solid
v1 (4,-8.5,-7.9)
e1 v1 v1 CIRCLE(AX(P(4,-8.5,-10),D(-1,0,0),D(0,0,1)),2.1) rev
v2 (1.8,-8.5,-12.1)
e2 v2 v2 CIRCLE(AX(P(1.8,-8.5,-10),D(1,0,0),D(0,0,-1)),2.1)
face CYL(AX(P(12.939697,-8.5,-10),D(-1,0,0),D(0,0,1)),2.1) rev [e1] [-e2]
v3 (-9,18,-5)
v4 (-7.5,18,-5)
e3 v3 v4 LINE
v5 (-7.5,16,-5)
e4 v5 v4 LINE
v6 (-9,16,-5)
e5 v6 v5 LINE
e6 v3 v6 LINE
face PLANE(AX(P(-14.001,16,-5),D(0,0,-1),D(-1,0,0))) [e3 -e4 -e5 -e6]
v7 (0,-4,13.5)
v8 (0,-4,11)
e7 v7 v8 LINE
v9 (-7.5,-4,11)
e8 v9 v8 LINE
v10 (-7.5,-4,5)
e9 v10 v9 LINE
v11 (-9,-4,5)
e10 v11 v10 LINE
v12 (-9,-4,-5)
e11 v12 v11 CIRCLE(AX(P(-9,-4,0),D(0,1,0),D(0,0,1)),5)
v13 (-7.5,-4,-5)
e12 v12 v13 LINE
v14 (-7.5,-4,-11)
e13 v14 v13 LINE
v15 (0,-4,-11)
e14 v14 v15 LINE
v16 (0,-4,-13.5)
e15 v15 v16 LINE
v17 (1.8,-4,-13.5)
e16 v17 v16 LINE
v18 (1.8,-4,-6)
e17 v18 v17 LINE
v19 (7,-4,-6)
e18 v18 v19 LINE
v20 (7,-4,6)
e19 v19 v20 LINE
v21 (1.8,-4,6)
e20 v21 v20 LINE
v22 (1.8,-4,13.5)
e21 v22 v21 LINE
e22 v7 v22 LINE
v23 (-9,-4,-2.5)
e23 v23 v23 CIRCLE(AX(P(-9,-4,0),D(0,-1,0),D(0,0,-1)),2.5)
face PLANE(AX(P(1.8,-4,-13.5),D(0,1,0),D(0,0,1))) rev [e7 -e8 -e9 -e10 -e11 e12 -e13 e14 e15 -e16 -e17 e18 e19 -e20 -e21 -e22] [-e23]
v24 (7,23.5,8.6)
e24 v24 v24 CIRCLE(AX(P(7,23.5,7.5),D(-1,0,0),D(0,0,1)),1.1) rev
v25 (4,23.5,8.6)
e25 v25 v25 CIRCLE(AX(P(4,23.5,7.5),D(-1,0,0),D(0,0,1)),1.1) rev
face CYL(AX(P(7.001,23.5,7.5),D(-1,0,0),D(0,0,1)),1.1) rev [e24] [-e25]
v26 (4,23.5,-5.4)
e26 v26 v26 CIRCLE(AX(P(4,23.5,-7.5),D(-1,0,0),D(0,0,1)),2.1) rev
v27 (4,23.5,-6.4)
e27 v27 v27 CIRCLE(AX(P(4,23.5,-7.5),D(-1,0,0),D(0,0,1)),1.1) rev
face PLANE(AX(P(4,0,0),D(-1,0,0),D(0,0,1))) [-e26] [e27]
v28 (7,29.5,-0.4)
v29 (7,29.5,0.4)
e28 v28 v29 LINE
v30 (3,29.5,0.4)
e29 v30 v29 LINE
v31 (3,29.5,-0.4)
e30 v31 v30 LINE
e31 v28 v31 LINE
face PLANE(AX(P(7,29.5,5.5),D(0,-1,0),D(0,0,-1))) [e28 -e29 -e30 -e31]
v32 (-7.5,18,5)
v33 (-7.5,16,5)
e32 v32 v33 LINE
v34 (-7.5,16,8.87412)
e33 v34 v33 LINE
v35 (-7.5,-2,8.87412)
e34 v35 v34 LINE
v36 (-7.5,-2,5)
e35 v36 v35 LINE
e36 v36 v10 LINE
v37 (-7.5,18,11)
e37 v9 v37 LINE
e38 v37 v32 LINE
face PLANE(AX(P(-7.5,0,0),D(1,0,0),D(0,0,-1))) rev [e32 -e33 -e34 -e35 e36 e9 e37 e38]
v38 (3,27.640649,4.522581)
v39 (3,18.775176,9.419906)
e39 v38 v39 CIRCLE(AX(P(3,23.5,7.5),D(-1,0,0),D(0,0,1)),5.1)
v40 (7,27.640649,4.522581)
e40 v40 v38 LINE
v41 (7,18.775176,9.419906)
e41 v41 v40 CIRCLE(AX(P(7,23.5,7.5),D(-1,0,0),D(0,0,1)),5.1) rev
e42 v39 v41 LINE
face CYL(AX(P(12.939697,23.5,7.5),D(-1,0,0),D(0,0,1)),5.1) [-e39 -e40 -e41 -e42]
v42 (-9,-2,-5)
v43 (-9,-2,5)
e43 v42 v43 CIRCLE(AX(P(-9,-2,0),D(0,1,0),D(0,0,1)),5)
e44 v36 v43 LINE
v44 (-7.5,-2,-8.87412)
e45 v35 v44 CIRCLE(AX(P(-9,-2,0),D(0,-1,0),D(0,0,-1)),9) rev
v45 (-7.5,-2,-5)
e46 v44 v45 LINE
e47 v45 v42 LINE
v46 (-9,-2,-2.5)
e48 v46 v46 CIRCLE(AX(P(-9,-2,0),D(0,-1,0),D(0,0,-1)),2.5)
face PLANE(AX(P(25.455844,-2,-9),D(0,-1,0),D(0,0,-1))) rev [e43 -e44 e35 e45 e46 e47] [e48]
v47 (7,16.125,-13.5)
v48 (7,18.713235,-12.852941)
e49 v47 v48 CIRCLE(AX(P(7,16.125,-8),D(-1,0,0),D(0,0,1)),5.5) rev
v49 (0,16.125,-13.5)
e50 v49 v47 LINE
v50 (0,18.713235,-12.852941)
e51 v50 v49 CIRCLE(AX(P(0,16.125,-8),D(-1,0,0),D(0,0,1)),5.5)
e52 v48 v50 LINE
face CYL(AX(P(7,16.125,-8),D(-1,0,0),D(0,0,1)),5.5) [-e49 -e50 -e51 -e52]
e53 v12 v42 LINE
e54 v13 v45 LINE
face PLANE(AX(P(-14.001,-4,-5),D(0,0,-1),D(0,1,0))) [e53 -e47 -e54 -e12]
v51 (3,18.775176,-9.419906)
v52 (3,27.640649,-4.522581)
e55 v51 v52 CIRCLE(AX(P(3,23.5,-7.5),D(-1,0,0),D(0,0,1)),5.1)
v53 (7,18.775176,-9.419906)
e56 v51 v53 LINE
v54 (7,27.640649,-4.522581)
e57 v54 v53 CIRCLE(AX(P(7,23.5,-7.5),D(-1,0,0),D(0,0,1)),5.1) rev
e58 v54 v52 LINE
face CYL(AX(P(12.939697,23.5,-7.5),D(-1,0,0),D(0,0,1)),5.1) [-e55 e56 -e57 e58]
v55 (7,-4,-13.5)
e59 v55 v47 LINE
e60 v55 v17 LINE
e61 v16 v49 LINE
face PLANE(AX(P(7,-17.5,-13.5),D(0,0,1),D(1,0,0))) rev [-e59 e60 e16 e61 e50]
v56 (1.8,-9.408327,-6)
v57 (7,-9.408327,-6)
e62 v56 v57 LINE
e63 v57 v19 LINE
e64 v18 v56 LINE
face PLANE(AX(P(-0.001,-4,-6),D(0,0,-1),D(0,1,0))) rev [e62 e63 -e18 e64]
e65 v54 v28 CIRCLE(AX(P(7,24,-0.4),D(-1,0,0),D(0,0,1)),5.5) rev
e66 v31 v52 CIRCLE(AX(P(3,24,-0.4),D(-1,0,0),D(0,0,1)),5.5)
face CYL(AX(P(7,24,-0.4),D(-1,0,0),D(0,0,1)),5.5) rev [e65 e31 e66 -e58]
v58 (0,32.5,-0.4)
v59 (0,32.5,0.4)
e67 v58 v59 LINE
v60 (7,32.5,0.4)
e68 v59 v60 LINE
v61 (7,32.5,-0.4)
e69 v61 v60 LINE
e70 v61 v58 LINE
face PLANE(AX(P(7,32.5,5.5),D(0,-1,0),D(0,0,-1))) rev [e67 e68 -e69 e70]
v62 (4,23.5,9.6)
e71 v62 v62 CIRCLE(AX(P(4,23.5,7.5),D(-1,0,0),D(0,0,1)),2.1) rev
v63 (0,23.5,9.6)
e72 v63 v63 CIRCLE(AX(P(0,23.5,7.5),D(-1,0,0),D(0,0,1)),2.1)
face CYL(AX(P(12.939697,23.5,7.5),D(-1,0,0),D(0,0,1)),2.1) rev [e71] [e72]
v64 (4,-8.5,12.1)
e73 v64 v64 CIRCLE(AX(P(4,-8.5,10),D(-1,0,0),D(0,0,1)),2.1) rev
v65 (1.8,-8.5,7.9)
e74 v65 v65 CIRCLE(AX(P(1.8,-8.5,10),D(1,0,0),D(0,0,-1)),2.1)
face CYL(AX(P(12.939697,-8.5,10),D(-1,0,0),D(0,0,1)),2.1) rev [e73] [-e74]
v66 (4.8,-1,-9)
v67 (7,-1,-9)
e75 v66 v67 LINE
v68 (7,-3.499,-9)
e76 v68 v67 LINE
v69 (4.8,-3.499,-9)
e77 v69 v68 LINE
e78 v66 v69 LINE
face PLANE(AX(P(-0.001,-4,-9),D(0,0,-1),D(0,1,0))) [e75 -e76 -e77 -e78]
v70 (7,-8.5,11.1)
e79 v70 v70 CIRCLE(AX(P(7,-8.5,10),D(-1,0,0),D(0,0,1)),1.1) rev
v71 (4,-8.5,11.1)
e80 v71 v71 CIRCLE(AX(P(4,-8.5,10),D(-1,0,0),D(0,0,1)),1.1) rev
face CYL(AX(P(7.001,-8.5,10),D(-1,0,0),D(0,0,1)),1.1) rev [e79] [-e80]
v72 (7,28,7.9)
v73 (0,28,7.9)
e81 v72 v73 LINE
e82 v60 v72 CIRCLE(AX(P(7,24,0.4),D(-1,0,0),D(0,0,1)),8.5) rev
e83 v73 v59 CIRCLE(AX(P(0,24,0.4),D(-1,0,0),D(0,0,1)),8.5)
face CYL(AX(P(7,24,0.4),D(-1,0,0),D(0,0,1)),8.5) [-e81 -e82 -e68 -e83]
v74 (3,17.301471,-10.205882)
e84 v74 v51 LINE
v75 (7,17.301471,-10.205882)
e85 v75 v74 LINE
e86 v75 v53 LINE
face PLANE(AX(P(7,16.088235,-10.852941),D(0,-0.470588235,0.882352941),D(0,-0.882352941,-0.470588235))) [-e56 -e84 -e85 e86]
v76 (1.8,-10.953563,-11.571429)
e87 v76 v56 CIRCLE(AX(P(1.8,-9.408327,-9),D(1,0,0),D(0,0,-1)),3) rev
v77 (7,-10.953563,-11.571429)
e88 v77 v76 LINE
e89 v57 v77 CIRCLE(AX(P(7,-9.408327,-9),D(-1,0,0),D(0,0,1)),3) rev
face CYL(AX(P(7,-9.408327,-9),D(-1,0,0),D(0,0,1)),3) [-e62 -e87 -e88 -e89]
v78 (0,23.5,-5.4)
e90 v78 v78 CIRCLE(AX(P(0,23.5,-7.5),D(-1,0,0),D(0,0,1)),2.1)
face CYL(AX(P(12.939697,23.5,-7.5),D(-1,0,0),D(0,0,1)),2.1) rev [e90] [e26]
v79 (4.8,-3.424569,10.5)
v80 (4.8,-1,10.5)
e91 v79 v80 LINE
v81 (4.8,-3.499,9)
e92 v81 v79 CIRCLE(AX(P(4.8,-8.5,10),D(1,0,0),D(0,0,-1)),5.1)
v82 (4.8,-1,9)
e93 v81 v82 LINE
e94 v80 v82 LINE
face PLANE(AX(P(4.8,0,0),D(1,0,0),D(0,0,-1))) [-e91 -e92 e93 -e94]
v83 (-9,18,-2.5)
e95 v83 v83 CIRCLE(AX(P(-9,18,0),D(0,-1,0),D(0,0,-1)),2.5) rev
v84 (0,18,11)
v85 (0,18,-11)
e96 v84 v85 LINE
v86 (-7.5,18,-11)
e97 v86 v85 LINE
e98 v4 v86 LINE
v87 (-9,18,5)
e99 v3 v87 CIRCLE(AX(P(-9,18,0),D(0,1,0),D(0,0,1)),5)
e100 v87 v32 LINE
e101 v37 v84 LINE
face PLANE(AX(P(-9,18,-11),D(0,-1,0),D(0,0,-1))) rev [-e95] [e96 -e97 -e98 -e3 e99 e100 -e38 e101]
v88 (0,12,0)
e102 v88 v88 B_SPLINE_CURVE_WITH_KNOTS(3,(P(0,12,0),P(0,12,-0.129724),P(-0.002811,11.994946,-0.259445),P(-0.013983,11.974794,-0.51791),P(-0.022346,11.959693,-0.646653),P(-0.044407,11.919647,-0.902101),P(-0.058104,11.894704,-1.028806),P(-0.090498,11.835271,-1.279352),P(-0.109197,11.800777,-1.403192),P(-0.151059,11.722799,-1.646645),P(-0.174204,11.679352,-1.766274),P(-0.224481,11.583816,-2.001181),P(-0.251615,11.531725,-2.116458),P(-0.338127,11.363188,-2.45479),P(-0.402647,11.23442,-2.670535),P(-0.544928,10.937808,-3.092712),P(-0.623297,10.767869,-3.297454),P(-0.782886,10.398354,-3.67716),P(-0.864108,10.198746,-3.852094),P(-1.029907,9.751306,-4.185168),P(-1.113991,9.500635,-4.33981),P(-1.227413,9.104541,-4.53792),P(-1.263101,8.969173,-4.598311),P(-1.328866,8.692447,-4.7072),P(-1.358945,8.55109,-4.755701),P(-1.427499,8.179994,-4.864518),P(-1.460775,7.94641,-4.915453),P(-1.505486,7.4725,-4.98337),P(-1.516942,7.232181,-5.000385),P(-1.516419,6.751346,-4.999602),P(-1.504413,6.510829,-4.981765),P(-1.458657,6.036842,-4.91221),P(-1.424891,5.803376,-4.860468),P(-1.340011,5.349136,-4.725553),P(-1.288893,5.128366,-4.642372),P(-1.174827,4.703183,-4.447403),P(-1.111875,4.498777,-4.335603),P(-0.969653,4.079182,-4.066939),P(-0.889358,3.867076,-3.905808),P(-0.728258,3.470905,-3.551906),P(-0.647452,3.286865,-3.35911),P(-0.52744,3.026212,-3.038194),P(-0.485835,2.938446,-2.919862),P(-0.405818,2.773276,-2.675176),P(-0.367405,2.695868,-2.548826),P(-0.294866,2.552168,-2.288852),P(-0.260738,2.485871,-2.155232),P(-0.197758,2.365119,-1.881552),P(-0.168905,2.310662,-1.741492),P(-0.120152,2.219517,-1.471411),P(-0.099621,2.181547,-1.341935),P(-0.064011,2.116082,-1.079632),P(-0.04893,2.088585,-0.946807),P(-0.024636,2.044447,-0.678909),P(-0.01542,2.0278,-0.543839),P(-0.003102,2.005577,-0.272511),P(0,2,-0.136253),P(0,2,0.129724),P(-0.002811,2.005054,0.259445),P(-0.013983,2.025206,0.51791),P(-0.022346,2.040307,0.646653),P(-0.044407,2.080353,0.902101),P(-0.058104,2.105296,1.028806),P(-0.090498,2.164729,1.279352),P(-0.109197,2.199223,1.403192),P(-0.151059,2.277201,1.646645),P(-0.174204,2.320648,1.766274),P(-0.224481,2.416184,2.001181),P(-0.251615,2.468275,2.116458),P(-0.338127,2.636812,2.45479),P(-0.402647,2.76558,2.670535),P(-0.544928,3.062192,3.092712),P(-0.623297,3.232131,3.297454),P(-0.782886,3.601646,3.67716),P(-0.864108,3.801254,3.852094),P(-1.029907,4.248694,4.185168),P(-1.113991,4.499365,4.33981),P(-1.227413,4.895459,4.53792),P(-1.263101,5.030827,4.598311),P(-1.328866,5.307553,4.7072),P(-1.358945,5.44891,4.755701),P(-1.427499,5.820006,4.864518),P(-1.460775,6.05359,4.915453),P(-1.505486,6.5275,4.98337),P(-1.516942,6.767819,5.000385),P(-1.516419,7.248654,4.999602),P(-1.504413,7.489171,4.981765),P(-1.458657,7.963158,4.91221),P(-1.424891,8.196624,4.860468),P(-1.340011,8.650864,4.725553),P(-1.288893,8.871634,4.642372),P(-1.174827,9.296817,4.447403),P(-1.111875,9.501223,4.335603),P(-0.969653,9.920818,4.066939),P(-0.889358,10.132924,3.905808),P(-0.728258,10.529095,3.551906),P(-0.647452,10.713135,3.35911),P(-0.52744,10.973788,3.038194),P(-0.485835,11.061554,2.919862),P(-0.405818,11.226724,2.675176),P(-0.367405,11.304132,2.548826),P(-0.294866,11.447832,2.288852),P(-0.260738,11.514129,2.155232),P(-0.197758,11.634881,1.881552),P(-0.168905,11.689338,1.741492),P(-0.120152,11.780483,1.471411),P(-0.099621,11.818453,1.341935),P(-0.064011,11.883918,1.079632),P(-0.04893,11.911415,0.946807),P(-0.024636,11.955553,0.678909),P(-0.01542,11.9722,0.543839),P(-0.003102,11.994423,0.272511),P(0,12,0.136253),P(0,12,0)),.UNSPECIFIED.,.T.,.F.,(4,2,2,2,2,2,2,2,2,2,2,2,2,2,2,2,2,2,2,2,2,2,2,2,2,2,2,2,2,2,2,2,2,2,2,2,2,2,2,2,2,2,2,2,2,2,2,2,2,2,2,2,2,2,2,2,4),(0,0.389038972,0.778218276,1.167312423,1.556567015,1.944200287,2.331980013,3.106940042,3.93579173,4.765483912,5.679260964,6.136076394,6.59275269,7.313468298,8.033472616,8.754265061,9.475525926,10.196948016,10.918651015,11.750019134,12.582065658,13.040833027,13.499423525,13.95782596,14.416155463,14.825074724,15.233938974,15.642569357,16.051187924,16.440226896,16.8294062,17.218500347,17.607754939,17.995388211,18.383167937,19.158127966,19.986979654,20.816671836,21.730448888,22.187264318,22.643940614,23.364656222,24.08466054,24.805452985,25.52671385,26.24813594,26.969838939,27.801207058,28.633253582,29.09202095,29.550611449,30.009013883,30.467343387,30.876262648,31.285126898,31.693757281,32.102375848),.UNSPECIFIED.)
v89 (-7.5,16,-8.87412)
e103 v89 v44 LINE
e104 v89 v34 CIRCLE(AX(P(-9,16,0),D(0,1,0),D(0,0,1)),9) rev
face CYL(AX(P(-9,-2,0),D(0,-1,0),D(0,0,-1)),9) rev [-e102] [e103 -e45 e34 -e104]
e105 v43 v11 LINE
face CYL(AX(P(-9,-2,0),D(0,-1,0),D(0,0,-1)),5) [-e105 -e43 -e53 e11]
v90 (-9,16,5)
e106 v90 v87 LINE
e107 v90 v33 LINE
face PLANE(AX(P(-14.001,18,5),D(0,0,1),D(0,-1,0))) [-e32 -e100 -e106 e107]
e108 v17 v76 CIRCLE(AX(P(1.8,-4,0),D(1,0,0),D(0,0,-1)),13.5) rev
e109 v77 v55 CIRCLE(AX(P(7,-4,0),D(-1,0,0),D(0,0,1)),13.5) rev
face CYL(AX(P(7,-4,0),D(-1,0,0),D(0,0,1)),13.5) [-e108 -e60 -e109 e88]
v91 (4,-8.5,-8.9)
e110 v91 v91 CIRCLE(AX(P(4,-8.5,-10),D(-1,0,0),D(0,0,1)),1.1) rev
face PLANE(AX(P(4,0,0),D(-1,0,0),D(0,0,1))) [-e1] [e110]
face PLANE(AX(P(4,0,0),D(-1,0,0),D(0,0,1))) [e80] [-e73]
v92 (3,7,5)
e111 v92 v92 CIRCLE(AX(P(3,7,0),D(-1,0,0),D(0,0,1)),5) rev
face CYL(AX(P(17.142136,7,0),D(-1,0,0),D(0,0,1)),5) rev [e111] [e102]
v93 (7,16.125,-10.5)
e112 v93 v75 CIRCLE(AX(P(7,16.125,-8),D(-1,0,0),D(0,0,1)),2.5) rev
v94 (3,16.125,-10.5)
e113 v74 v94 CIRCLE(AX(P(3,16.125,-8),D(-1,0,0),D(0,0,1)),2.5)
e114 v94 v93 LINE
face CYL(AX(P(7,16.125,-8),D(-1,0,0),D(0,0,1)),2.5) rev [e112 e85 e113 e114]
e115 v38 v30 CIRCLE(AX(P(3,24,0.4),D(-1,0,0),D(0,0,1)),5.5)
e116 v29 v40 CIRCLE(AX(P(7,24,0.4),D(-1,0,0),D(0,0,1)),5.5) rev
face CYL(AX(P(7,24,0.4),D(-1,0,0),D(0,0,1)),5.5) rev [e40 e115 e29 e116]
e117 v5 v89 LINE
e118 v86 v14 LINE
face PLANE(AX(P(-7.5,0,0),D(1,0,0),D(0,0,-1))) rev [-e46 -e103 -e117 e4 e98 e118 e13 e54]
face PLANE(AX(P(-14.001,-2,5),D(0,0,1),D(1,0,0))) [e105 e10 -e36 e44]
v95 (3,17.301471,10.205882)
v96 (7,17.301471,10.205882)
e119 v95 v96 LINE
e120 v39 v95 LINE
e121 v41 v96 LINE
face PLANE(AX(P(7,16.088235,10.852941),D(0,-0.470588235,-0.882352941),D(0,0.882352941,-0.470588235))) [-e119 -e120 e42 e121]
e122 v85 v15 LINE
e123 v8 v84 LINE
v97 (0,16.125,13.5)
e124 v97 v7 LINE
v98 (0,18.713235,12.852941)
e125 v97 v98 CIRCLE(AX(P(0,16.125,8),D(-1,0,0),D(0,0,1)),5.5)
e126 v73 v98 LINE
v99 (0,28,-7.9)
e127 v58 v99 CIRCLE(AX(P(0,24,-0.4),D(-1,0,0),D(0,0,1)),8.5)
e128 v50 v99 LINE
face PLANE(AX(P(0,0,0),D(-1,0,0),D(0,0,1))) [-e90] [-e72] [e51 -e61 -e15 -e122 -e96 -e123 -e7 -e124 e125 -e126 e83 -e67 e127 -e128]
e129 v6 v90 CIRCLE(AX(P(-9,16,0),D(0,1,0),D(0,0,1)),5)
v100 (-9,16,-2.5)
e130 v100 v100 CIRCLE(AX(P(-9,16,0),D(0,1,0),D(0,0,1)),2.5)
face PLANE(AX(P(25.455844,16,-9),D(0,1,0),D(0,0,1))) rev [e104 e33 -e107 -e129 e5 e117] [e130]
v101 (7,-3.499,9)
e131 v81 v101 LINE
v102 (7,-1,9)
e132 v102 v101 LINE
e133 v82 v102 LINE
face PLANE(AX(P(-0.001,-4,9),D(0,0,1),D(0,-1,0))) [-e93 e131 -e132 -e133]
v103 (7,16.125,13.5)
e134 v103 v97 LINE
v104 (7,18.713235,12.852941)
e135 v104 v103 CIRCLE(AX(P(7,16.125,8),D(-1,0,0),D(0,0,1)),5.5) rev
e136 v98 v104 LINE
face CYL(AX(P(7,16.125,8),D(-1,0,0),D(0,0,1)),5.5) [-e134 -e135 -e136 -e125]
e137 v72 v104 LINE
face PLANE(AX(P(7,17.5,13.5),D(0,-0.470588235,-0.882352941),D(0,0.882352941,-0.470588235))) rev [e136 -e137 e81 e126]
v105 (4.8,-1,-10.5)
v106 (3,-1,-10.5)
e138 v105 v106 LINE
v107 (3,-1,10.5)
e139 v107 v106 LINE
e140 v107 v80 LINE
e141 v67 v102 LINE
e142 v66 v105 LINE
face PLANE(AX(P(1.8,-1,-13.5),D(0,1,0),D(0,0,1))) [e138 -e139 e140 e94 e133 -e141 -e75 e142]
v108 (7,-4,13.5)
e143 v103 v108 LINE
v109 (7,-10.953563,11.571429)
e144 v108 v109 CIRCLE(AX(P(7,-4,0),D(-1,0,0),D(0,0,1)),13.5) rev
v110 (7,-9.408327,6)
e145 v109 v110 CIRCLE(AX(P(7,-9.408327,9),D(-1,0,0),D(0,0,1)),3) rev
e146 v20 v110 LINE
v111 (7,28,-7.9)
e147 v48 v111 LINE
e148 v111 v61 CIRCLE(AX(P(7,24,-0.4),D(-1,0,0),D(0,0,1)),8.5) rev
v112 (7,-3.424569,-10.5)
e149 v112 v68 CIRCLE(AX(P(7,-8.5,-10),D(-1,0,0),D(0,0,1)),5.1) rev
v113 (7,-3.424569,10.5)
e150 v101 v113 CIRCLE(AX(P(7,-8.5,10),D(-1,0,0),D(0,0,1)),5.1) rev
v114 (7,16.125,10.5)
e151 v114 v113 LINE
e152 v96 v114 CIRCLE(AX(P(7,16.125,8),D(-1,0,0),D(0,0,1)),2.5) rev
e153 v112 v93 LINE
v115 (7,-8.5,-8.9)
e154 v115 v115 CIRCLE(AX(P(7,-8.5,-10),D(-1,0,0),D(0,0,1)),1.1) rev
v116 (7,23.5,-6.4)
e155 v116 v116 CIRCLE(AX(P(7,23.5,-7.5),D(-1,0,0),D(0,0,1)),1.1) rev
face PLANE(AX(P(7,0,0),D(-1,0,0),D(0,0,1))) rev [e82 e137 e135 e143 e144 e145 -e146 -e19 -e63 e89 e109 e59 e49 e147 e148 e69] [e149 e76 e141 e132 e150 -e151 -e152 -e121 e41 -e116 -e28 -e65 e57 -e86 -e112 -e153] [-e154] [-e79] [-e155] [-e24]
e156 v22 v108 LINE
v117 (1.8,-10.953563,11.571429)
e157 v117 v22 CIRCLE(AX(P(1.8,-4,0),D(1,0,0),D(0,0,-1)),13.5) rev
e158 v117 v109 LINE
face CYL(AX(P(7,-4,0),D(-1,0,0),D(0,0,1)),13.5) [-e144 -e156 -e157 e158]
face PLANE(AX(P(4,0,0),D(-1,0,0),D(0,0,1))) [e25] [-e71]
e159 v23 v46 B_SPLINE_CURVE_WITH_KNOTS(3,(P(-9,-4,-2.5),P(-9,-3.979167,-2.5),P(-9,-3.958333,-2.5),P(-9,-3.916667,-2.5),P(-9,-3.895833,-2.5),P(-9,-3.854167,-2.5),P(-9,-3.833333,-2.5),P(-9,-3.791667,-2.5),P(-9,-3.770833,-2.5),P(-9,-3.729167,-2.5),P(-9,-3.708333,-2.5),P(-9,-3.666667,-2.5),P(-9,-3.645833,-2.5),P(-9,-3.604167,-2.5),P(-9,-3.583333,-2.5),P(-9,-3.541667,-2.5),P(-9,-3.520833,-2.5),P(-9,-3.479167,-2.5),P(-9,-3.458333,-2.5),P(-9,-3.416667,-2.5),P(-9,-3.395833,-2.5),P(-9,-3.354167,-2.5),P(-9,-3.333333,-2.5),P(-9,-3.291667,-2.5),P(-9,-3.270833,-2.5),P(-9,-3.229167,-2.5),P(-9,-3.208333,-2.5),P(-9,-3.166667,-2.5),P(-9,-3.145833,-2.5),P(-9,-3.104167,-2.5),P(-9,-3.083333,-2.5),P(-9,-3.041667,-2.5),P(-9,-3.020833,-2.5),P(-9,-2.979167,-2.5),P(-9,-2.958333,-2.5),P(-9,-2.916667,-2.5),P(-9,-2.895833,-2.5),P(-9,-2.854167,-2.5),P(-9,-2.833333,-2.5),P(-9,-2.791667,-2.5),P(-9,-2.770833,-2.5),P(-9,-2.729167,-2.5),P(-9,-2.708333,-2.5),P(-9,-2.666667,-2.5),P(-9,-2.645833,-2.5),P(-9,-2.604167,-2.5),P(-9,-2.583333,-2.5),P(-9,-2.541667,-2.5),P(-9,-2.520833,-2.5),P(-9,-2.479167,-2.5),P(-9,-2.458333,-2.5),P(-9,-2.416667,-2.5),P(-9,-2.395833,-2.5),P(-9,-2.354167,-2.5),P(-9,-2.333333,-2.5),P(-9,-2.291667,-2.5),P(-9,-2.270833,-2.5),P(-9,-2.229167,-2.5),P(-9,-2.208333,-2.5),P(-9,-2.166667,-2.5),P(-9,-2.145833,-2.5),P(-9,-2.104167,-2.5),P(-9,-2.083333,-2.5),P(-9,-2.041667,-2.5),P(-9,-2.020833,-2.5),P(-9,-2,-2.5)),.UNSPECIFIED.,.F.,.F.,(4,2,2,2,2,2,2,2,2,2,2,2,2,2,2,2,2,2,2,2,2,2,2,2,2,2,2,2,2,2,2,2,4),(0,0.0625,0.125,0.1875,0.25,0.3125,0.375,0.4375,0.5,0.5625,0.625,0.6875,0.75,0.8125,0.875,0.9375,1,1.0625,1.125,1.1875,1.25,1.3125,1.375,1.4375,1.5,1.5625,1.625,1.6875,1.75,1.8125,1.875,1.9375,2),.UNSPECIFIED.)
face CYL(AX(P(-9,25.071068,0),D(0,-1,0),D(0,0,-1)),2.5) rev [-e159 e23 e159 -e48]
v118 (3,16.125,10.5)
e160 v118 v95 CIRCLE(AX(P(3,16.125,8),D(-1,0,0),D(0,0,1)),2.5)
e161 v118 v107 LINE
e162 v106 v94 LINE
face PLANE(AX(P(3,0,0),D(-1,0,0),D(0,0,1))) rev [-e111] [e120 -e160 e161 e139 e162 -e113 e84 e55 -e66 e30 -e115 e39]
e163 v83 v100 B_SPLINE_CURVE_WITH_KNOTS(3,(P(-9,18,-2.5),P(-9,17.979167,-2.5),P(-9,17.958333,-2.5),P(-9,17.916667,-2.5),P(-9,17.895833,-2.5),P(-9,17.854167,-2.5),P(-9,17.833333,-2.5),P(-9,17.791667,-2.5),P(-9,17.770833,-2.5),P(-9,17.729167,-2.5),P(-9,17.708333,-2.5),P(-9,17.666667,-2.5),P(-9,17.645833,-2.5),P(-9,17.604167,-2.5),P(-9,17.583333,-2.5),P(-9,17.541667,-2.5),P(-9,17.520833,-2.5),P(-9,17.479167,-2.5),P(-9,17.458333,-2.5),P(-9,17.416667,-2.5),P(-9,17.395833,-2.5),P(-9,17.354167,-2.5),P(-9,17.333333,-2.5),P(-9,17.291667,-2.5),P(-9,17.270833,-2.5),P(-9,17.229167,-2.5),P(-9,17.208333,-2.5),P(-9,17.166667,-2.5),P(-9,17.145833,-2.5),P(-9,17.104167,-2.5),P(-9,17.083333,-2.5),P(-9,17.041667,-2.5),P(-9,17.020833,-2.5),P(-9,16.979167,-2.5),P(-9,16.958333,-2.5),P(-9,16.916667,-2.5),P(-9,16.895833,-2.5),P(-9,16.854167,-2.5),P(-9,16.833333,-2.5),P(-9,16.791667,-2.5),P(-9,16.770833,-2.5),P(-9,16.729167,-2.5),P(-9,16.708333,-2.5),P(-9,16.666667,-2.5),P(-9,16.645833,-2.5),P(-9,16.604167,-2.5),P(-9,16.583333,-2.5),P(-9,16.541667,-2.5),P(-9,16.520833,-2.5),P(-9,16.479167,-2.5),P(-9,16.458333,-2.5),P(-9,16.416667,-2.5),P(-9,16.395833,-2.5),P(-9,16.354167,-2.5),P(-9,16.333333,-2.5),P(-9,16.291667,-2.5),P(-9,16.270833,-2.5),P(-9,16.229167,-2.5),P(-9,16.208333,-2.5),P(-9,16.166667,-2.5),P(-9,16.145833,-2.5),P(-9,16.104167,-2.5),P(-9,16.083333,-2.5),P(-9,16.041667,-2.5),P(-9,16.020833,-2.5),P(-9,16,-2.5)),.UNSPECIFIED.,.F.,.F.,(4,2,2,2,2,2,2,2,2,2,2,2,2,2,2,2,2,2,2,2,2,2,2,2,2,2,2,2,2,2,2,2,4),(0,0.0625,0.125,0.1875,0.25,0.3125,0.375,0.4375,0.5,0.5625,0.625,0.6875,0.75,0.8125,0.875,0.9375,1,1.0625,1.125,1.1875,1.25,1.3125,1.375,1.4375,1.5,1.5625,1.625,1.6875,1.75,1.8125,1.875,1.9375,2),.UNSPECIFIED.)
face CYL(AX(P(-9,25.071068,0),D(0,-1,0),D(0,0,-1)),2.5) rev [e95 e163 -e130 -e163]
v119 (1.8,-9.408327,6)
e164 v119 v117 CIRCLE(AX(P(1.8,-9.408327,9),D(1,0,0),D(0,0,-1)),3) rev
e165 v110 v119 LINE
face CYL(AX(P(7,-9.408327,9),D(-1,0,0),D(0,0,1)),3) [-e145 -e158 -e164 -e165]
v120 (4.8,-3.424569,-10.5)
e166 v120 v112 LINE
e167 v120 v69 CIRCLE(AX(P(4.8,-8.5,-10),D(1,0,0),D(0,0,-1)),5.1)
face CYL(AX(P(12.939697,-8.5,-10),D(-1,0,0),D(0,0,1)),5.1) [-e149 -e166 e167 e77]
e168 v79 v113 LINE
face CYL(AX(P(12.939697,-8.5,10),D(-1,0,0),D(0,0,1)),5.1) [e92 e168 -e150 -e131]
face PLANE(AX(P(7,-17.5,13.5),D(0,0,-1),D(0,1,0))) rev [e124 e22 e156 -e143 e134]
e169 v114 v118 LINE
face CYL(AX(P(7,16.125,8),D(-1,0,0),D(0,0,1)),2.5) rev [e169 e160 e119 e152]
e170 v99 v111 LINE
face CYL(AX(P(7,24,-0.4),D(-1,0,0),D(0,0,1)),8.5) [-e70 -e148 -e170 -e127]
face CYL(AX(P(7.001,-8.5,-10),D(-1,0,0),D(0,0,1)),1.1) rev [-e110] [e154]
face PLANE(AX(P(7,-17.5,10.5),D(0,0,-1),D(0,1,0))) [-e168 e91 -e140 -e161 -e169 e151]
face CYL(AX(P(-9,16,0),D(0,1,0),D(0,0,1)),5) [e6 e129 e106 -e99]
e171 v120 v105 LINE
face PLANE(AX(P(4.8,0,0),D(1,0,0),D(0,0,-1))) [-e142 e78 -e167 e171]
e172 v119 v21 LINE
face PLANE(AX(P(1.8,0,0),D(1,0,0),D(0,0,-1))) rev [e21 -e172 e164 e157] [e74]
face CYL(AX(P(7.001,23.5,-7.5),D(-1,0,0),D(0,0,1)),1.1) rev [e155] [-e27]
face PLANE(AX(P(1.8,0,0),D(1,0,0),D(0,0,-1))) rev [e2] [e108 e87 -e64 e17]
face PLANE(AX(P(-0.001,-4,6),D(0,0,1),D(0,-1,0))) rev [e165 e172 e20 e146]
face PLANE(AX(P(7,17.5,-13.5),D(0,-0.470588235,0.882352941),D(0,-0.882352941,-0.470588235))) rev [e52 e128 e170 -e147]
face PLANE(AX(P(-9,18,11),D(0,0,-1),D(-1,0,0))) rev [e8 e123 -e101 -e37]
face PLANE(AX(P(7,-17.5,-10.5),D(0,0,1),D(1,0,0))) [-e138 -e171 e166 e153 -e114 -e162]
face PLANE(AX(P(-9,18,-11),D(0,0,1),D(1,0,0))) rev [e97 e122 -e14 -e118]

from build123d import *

# Parameters (mm, degrees)
BOSS_EXTRUDE1_DEPTH                  = 7
FILLET1_R                            = 8.5
FILLET2_R                            = 5.5
FILLET3_R                            = 13.5
SKETCH3_W                            = 27
SKETCH3_H                            = 13.5
CUT_EXTRUDE1_DEPTH                   = 1.8
CUT_EXTRUDE5_REACH                   = 37.882
SKETCH12_W                           = 12
SKETCH12_H                           = 13.5
CUT_EXTRUDE6_REACH                   = 37.882
SKETCH13_R                           = 1.1
SKETCH17_R                           = 2.1
CUT_EXTRUDE14_DEPTH                  = 4
FILLET4_R                            = 3
SHELL2_START                         = 3
SHELL2_DEPTH                         = 4
SHELL2_START_2                       = 4.8
SHELL2_2_DEPTH                       = 2.2
SKETCH18_W                           = 22
SKETCH18_H                           = 22
BOSS_EXTRUDE2_DEPTH                  = 9
SKETCH19_W                           = 18
SKETCH19_H                           = 18
CUT_EXTRUDE15_DEPTH                  = 9
SKETCH20_R                           = 5
CUT_EXTRUDE16_DEPTH                  = 3
FILLET5_R                            = 9
SKETCH21_R                           = 5
BOSS_EXTRUDE3_DEPTH                  = 2
CUT_EXTRUDE17_DEPTH                  = 1.5
CUT_EXTRUDE17_DIRECTION_2_REACH      = 40.659
CUT_EXTRUDE17_DIRECTION_2_END_RADIUS = 5
CUT_EXTRUDE18_REACH                  = 43.358
SKETCH23_R                           = 2.5


# Read off the part's stored shape, not the designer's step: Shell2
# Some blends are built 0.0001 mm under size
with BuildPart() as part:
    # Sketch2 → Boss-Extrude1 (new body)
    with BuildSketch(Plane(origin=(0, 0, 0), x_dir=(0, 0, -1), z_dir=(1, 0, 0))):
        Polygon((-13.5, -17.5), (13.5, -17.5), (13.5, 17.5), (5.5, 32.5), (-5.5, 32.5), (-13.5, 17.5), align=None)
    extrude(amount=BOSS_EXTRUDE1_DEPTH)

    # Fillet1
    fillet1_edges = [part.edges().sort_by_distance(p)[0] for p in [
        (3.5, 32.5, 5.5),
        (3.5, 32.5, -5.5),
    ]]
    fillet(fillet1_edges, radius=FILLET1_R)

    # Fillet2
    fillet2_edges = [part.edges().sort_by_distance(p)[0] for p in [
        (3.5, 17.5, -13.5),
        (3.5, 17.5, 13.5),
    ]]
    fillet(fillet2_edges, radius=FILLET2_R)

    # Fillet3
    fillet3_edges = [part.edges().sort_by_distance(p)[0] for p in [
        (3.5, -17.5, 13.5),
        (3.5, -17.5, -13.5),
    ]]
    fillet(fillet3_edges, radius=FILLET3_R - 0.0001)  # a hair under: the kernel refuses the full size

    # Sketch3 → Cut-Extrude1 (cut)
    with BuildSketch(Plane.ZY):
        with Locations((0, -10.75)):
            Rectangle(SKETCH3_W, SKETCH3_H)
    extrude(amount=-CUT_EXTRUDE1_DEPTH, mode=Mode.SUBTRACT)

    # Sketch12 → Cut-Extrude5 (cut, up to next)
    with BuildSketch(Plane(origin=(7, 0, 0), x_dir=(0, 0, -1), z_dir=(1, 0, 0)), mode=Mode.PRIVATE) as cut_extrude5_sk1:
        with Locations((0, -10.75)):
            Rectangle(SKETCH12_W, SKETCH12_H)
    cut_extrude5_tool1 = extrude(cut_extrude5_sk1.sketch, amount=-CUT_EXTRUDE5_REACH, mode=Mode.PRIVATE) & part.part
    add(cut_extrude5_tool1.solids().sort_by_distance((7, -10.75, 0))[0], mode=Mode.SUBTRACT)

    # Sketch13 → Cut-Extrude6 (cut, up to next)
    with BuildSketch(Plane.ZY, mode=Mode.PRIVATE) as cut_extrude6_sk1:
        with Locations((-7.5, 23.5)):
            Circle(SKETCH13_R)
    cut_extrude6_tool1 = extrude(cut_extrude6_sk1.sketch, amount=-CUT_EXTRUDE6_REACH, mode=Mode.PRIVATE) & part.part
    # Sketch13 → Cut-Extrude6 (cut, up to next)
    with BuildSketch(Plane.ZY, mode=Mode.PRIVATE) as cut_extrude6_sk2:
        with Locations((-10, -8.5)):
            Circle(SKETCH13_R)
    cut_extrude6_tool2 = extrude(cut_extrude6_sk2.sketch, amount=-CUT_EXTRUDE6_REACH, mode=Mode.PRIVATE) & part.part
    # Sketch13 → Cut-Extrude6 (cut, up to next)
    with BuildSketch(Plane.ZY, mode=Mode.PRIVATE) as cut_extrude6_sk3:
        with Locations((10, -8.5)):
            Circle(SKETCH13_R)
    cut_extrude6_tool3 = extrude(cut_extrude6_sk3.sketch, amount=-CUT_EXTRUDE6_REACH, mode=Mode.PRIVATE) & part.part
    # Sketch13 → Cut-Extrude6 (cut, up to next)
    with BuildSketch(Plane.ZY, mode=Mode.PRIVATE) as cut_extrude6_sk4:
        with Locations((7.5, 23.5)):
            Circle(SKETCH13_R)
    cut_extrude6_tool4 = extrude(cut_extrude6_sk4.sketch, amount=-CUT_EXTRUDE6_REACH, mode=Mode.PRIVATE) & part.part
    add(cut_extrude6_tool1.solids().sort_by_distance((0, 23.5, -7.5))[0], mode=Mode.SUBTRACT)
    add(cut_extrude6_tool2.solids().sort_by_distance((0, -8.5, -10))[0], mode=Mode.SUBTRACT)
    add(cut_extrude6_tool3.solids().sort_by_distance((0, -8.5, 10))[0], mode=Mode.SUBTRACT)
    add(cut_extrude6_tool4.solids().sort_by_distance((0, 23.5, 7.5))[0], mode=Mode.SUBTRACT)

    # Sketch17 → Cut-Extrude14 (cut)
    with BuildSketch(Plane.ZY):
        with Locations((-7.5, 23.5)):
            Circle(SKETCH17_R)
        with Locations((7.5, 23.5)):
            Circle(SKETCH17_R)
        with Locations((-10, -8.5)):
            Circle(SKETCH17_R)
        with Locations((10, -8.5)):
            Circle(SKETCH17_R)
    extrude(amount=-CUT_EXTRUDE14_DEPTH, mode=Mode.SUBTRACT)

    # Fillet4
    fillet4_edges = [part.edges().sort_by_distance(p)[0] for p in [
        (4.4, -16.093424605, -6),
        (4.4, -16.093424605, 6),
    ]]
    fillet(fillet4_edges, radius=FILLET4_R)

    # Shell2 outline → Shell2 (cut)
    with BuildSketch(Plane.YZ.offset(SHELL2_START)):
        with BuildLine():
            Line((17.301470588, -10.205882353), (18.775176121, -9.419906069))
            ThreePointArc((18.775176121, -9.419906069), (21.033978224, -3.035838645), (27.640649185, -4.522580929))
            ThreePointArc((27.640649185, -4.522580929), (29.013659867, -2.661241858), (29.5, -0.4))
            Line((29.5, -0.4), (29.5, 0.4))
            ThreePointArc((29.5, 0.4), (29.013659867, 2.661241858), (27.640649185, 4.522580929))
            ThreePointArc((27.640649185, 4.522580929), (21.033978224, 3.035838645), (18.775176121, 9.419906069))
            Line((18.775176121, 9.419906069), (17.301470588, 10.205882353))
            ThreePointArc((17.301470588, 10.205882353), (16.731339062, 10.42535625), (16.125, 10.5))
            Line((16.125, 10.5), (-1, 10.5))
            Line((-1, 10.5), (-1, -10.5))
            Line((-1, -10.5), (16.125, -10.5))
            ThreePointArc((16.125, -10.5), (16.731339062, -10.42535625), (17.301470588, -10.205882353))
        make_face()
    extrude(amount=SHELL2_DEPTH, mode=Mode.SUBTRACT)

    # Shell2 2 outline → Shell2 2 (cut)
    with BuildSketch(Plane.YZ.offset(SHELL2_START_2)):
        with BuildLine():
            Line((-3.424568984, -10.5), (-1, -10.5))
            Line((-1, -10.5), (-1, -9))
            Line((-1, -9), (-3.4990001, -9))
            ThreePointArc((-3.4990001, -9), (-3.406267086, -9.747245183), (-3.424568984, -10.5))
        make_face()
        with BuildLine():
            Line((-3.4990001, 9), (-1, 9))
            Line((-1, 9), (-1, 10.5))
            Line((-1, 10.5), (-3.424568984, 10.5))
            ThreePointArc((-3.424568984, 10.5), (-3.406267086, 9.747245183), (-3.4990001, 9))
        make_face()
    extrude(amount=SHELL2_2_DEPTH, mode=Mode.SUBTRACT)

    # Sketch18 → Boss-Extrude2 (add)
    with BuildSketch(Plane.ZY):
        with Locations((0, 7)):
            Rectangle(SKETCH18_W, SKETCH18_H)
    extrude(amount=BOSS_EXTRUDE2_DEPTH)

    # Sketch19 → Cut-Extrude15 (cut)
    with BuildSketch(Plane.ZY.offset(9)):
        with Locations((0, 7)):
            Rectangle(SKETCH19_W, SKETCH19_H)
    extrude(amount=-CUT_EXTRUDE15_DEPTH, mode=Mode.SUBTRACT)

    # Sketch20 → Cut-Extrude16 (cut)
    with BuildSketch(Plane.ZY):
        with Locations((0, 7)):
            Circle(SKETCH20_R)
    extrude(amount=-CUT_EXTRUDE16_DEPTH, mode=Mode.SUBTRACT)

    # Fillet5
    # the kernel refuses this fillet: 9 mm, written as the material it adds along each edge
    with BuildSketch(Plane(origin=(0, 16, -9), x_dir=(-1, 0, 0), z_dir=(0, -1, 0))) as fillet5_piece_1_section:
        with BuildLine():
            CenterArc((FILLET5_R, -FILLET5_R), FILLET5_R, 90, 90)
            Line((0, -FILLET5_R), (0, 0))
            Line((0, 0), (FILLET5_R, 0))
        make_face()
    fillet5_piece_1 = extrude(amount=18, mode=Mode.PRIVATE)
    fillet5_piece_1 = fillet5_piece_1 - Plane(origin=(-0.132604543, 7, 0), x_dir=(0, 0, 1), z_dir=(-1, 0, 0)) * Cylinder(5, 72, mode=Mode.PRIVATE)
    add(fillet5_piece_1)
    with BuildSketch(Plane(origin=(0, -2, 9), x_dir=(-1, 0, 0), z_dir=(0, 1, 0))) as fillet5_piece_2_section:
        with BuildLine():
            CenterArc((FILLET5_R, -FILLET5_R), FILLET5_R, 90, 90)
            Line((0, -FILLET5_R), (0, 0))
            Line((0, 0), (FILLET5_R, 0))
        make_face()
    fillet5_piece_2 = extrude(amount=18, mode=Mode.PRIVATE)
    fillet5_piece_2 = fillet5_piece_2 - Plane(origin=(-2.089358555, 7, 0), x_dir=(0, 0, 1), z_dir=(-1, 0, 0)) * Cylinder(5, 72, mode=Mode.PRIVATE)
    add(fillet5_piece_2)

    # Sketch21 → Boss-Extrude3 (add)
    with BuildSketch(Plane(origin=(0, 18, 0), x_dir=(1, 0, 0), z_dir=(0, 1, 0))):
        with Locations((-9, 0)):
            Circle(SKETCH21_R)
    boss_extrude3 = extrude(amount=-BOSS_EXTRUDE3_DEPTH)

    # Mirror1: Boss-Extrude3 across plane
    add(boss_extrude3.mirror(Plane.ZX.offset(7)))

    # Sketch22 → Cut-Extrude17 (cut)
    with BuildSketch(Plane.ZY.offset(9)):
        Polygon((-5, 16), (-5, 18), (-11, 18), (-11, -4), (-5, -4), (-5, -2), (5, -2), (5, -4), (11, -4), (11, 18), (5, 18), (5, 16), align=None)
    extrude(amount=-CUT_EXTRUDE17_DEPTH, mode=Mode.SUBTRACT)

    # Cut-Extrude17 direction 2: up to this cylinder (the profile starts inside it)
    cut_extrude17_direction_2_end = Plane(origin=(-9, 7, 0), z_dir=(0, 1, 0)) * Cylinder(CUT_EXTRUDE17_DIRECTION_2_END_RADIUS, 92.318, mode=Mode.PRIVATE)
    # Sketch22 → Cut-Extrude17 direction 2 (cut, up to the surface)
    with BuildSketch(Plane.ZY.offset(9), mode=Mode.PRIVATE) as cut_extrude17_direction_2_sk1:
        Polygon((-5, 16), (-5, 18), (-11, 18), (-11, -4), (-5, -4), (-5, -2), (5, -2), (5, -4), (11, -4), (11, 18), (5, 18), (5, 16), align=None)
    cut_extrude17_direction_2_tool1 = extrude(cut_extrude17_direction_2_sk1.sketch, amount=CUT_EXTRUDE17_DIRECTION_2_REACH, mode=Mode.PRIVATE) & cut_extrude17_direction_2_end
    add(cut_extrude17_direction_2_tool1.solids().sort_by_distance((-9, 7, 0))[0], mode=Mode.SUBTRACT)

    # Cut-Extrude18: up to this face of the body (flat: up to its plane)
    cut_extrude18_end = Plane(part.part.faces().sort_by_distance((-5.378131987, 18, 0))[0])
    # Sketch23 → Cut-Extrude18 (cut, up to the picked face)
    with BuildSketch(Plane.XZ.offset(4), mode=Mode.PRIVATE) as cut_extrude18_sk1:
        with Locations(Location((-9, 0, 0), (0, 0, 270))):
            Circle(SKETCH23_R)
    cut_extrude18_tool1 = split(extrude(cut_extrude18_sk1.sketch, amount=-CUT_EXTRUDE18_REACH, mode=Mode.PRIVATE), bisect_by=cut_extrude18_end, keep=Keep.BOTH, mode=Mode.PRIVATE)
    add(cut_extrude18_tool1.solids().sort_by(Axis((-9, -4, 0), (0, 1, 0)))[0], mode=Mode.SUBTRACT)


solid = part.part
